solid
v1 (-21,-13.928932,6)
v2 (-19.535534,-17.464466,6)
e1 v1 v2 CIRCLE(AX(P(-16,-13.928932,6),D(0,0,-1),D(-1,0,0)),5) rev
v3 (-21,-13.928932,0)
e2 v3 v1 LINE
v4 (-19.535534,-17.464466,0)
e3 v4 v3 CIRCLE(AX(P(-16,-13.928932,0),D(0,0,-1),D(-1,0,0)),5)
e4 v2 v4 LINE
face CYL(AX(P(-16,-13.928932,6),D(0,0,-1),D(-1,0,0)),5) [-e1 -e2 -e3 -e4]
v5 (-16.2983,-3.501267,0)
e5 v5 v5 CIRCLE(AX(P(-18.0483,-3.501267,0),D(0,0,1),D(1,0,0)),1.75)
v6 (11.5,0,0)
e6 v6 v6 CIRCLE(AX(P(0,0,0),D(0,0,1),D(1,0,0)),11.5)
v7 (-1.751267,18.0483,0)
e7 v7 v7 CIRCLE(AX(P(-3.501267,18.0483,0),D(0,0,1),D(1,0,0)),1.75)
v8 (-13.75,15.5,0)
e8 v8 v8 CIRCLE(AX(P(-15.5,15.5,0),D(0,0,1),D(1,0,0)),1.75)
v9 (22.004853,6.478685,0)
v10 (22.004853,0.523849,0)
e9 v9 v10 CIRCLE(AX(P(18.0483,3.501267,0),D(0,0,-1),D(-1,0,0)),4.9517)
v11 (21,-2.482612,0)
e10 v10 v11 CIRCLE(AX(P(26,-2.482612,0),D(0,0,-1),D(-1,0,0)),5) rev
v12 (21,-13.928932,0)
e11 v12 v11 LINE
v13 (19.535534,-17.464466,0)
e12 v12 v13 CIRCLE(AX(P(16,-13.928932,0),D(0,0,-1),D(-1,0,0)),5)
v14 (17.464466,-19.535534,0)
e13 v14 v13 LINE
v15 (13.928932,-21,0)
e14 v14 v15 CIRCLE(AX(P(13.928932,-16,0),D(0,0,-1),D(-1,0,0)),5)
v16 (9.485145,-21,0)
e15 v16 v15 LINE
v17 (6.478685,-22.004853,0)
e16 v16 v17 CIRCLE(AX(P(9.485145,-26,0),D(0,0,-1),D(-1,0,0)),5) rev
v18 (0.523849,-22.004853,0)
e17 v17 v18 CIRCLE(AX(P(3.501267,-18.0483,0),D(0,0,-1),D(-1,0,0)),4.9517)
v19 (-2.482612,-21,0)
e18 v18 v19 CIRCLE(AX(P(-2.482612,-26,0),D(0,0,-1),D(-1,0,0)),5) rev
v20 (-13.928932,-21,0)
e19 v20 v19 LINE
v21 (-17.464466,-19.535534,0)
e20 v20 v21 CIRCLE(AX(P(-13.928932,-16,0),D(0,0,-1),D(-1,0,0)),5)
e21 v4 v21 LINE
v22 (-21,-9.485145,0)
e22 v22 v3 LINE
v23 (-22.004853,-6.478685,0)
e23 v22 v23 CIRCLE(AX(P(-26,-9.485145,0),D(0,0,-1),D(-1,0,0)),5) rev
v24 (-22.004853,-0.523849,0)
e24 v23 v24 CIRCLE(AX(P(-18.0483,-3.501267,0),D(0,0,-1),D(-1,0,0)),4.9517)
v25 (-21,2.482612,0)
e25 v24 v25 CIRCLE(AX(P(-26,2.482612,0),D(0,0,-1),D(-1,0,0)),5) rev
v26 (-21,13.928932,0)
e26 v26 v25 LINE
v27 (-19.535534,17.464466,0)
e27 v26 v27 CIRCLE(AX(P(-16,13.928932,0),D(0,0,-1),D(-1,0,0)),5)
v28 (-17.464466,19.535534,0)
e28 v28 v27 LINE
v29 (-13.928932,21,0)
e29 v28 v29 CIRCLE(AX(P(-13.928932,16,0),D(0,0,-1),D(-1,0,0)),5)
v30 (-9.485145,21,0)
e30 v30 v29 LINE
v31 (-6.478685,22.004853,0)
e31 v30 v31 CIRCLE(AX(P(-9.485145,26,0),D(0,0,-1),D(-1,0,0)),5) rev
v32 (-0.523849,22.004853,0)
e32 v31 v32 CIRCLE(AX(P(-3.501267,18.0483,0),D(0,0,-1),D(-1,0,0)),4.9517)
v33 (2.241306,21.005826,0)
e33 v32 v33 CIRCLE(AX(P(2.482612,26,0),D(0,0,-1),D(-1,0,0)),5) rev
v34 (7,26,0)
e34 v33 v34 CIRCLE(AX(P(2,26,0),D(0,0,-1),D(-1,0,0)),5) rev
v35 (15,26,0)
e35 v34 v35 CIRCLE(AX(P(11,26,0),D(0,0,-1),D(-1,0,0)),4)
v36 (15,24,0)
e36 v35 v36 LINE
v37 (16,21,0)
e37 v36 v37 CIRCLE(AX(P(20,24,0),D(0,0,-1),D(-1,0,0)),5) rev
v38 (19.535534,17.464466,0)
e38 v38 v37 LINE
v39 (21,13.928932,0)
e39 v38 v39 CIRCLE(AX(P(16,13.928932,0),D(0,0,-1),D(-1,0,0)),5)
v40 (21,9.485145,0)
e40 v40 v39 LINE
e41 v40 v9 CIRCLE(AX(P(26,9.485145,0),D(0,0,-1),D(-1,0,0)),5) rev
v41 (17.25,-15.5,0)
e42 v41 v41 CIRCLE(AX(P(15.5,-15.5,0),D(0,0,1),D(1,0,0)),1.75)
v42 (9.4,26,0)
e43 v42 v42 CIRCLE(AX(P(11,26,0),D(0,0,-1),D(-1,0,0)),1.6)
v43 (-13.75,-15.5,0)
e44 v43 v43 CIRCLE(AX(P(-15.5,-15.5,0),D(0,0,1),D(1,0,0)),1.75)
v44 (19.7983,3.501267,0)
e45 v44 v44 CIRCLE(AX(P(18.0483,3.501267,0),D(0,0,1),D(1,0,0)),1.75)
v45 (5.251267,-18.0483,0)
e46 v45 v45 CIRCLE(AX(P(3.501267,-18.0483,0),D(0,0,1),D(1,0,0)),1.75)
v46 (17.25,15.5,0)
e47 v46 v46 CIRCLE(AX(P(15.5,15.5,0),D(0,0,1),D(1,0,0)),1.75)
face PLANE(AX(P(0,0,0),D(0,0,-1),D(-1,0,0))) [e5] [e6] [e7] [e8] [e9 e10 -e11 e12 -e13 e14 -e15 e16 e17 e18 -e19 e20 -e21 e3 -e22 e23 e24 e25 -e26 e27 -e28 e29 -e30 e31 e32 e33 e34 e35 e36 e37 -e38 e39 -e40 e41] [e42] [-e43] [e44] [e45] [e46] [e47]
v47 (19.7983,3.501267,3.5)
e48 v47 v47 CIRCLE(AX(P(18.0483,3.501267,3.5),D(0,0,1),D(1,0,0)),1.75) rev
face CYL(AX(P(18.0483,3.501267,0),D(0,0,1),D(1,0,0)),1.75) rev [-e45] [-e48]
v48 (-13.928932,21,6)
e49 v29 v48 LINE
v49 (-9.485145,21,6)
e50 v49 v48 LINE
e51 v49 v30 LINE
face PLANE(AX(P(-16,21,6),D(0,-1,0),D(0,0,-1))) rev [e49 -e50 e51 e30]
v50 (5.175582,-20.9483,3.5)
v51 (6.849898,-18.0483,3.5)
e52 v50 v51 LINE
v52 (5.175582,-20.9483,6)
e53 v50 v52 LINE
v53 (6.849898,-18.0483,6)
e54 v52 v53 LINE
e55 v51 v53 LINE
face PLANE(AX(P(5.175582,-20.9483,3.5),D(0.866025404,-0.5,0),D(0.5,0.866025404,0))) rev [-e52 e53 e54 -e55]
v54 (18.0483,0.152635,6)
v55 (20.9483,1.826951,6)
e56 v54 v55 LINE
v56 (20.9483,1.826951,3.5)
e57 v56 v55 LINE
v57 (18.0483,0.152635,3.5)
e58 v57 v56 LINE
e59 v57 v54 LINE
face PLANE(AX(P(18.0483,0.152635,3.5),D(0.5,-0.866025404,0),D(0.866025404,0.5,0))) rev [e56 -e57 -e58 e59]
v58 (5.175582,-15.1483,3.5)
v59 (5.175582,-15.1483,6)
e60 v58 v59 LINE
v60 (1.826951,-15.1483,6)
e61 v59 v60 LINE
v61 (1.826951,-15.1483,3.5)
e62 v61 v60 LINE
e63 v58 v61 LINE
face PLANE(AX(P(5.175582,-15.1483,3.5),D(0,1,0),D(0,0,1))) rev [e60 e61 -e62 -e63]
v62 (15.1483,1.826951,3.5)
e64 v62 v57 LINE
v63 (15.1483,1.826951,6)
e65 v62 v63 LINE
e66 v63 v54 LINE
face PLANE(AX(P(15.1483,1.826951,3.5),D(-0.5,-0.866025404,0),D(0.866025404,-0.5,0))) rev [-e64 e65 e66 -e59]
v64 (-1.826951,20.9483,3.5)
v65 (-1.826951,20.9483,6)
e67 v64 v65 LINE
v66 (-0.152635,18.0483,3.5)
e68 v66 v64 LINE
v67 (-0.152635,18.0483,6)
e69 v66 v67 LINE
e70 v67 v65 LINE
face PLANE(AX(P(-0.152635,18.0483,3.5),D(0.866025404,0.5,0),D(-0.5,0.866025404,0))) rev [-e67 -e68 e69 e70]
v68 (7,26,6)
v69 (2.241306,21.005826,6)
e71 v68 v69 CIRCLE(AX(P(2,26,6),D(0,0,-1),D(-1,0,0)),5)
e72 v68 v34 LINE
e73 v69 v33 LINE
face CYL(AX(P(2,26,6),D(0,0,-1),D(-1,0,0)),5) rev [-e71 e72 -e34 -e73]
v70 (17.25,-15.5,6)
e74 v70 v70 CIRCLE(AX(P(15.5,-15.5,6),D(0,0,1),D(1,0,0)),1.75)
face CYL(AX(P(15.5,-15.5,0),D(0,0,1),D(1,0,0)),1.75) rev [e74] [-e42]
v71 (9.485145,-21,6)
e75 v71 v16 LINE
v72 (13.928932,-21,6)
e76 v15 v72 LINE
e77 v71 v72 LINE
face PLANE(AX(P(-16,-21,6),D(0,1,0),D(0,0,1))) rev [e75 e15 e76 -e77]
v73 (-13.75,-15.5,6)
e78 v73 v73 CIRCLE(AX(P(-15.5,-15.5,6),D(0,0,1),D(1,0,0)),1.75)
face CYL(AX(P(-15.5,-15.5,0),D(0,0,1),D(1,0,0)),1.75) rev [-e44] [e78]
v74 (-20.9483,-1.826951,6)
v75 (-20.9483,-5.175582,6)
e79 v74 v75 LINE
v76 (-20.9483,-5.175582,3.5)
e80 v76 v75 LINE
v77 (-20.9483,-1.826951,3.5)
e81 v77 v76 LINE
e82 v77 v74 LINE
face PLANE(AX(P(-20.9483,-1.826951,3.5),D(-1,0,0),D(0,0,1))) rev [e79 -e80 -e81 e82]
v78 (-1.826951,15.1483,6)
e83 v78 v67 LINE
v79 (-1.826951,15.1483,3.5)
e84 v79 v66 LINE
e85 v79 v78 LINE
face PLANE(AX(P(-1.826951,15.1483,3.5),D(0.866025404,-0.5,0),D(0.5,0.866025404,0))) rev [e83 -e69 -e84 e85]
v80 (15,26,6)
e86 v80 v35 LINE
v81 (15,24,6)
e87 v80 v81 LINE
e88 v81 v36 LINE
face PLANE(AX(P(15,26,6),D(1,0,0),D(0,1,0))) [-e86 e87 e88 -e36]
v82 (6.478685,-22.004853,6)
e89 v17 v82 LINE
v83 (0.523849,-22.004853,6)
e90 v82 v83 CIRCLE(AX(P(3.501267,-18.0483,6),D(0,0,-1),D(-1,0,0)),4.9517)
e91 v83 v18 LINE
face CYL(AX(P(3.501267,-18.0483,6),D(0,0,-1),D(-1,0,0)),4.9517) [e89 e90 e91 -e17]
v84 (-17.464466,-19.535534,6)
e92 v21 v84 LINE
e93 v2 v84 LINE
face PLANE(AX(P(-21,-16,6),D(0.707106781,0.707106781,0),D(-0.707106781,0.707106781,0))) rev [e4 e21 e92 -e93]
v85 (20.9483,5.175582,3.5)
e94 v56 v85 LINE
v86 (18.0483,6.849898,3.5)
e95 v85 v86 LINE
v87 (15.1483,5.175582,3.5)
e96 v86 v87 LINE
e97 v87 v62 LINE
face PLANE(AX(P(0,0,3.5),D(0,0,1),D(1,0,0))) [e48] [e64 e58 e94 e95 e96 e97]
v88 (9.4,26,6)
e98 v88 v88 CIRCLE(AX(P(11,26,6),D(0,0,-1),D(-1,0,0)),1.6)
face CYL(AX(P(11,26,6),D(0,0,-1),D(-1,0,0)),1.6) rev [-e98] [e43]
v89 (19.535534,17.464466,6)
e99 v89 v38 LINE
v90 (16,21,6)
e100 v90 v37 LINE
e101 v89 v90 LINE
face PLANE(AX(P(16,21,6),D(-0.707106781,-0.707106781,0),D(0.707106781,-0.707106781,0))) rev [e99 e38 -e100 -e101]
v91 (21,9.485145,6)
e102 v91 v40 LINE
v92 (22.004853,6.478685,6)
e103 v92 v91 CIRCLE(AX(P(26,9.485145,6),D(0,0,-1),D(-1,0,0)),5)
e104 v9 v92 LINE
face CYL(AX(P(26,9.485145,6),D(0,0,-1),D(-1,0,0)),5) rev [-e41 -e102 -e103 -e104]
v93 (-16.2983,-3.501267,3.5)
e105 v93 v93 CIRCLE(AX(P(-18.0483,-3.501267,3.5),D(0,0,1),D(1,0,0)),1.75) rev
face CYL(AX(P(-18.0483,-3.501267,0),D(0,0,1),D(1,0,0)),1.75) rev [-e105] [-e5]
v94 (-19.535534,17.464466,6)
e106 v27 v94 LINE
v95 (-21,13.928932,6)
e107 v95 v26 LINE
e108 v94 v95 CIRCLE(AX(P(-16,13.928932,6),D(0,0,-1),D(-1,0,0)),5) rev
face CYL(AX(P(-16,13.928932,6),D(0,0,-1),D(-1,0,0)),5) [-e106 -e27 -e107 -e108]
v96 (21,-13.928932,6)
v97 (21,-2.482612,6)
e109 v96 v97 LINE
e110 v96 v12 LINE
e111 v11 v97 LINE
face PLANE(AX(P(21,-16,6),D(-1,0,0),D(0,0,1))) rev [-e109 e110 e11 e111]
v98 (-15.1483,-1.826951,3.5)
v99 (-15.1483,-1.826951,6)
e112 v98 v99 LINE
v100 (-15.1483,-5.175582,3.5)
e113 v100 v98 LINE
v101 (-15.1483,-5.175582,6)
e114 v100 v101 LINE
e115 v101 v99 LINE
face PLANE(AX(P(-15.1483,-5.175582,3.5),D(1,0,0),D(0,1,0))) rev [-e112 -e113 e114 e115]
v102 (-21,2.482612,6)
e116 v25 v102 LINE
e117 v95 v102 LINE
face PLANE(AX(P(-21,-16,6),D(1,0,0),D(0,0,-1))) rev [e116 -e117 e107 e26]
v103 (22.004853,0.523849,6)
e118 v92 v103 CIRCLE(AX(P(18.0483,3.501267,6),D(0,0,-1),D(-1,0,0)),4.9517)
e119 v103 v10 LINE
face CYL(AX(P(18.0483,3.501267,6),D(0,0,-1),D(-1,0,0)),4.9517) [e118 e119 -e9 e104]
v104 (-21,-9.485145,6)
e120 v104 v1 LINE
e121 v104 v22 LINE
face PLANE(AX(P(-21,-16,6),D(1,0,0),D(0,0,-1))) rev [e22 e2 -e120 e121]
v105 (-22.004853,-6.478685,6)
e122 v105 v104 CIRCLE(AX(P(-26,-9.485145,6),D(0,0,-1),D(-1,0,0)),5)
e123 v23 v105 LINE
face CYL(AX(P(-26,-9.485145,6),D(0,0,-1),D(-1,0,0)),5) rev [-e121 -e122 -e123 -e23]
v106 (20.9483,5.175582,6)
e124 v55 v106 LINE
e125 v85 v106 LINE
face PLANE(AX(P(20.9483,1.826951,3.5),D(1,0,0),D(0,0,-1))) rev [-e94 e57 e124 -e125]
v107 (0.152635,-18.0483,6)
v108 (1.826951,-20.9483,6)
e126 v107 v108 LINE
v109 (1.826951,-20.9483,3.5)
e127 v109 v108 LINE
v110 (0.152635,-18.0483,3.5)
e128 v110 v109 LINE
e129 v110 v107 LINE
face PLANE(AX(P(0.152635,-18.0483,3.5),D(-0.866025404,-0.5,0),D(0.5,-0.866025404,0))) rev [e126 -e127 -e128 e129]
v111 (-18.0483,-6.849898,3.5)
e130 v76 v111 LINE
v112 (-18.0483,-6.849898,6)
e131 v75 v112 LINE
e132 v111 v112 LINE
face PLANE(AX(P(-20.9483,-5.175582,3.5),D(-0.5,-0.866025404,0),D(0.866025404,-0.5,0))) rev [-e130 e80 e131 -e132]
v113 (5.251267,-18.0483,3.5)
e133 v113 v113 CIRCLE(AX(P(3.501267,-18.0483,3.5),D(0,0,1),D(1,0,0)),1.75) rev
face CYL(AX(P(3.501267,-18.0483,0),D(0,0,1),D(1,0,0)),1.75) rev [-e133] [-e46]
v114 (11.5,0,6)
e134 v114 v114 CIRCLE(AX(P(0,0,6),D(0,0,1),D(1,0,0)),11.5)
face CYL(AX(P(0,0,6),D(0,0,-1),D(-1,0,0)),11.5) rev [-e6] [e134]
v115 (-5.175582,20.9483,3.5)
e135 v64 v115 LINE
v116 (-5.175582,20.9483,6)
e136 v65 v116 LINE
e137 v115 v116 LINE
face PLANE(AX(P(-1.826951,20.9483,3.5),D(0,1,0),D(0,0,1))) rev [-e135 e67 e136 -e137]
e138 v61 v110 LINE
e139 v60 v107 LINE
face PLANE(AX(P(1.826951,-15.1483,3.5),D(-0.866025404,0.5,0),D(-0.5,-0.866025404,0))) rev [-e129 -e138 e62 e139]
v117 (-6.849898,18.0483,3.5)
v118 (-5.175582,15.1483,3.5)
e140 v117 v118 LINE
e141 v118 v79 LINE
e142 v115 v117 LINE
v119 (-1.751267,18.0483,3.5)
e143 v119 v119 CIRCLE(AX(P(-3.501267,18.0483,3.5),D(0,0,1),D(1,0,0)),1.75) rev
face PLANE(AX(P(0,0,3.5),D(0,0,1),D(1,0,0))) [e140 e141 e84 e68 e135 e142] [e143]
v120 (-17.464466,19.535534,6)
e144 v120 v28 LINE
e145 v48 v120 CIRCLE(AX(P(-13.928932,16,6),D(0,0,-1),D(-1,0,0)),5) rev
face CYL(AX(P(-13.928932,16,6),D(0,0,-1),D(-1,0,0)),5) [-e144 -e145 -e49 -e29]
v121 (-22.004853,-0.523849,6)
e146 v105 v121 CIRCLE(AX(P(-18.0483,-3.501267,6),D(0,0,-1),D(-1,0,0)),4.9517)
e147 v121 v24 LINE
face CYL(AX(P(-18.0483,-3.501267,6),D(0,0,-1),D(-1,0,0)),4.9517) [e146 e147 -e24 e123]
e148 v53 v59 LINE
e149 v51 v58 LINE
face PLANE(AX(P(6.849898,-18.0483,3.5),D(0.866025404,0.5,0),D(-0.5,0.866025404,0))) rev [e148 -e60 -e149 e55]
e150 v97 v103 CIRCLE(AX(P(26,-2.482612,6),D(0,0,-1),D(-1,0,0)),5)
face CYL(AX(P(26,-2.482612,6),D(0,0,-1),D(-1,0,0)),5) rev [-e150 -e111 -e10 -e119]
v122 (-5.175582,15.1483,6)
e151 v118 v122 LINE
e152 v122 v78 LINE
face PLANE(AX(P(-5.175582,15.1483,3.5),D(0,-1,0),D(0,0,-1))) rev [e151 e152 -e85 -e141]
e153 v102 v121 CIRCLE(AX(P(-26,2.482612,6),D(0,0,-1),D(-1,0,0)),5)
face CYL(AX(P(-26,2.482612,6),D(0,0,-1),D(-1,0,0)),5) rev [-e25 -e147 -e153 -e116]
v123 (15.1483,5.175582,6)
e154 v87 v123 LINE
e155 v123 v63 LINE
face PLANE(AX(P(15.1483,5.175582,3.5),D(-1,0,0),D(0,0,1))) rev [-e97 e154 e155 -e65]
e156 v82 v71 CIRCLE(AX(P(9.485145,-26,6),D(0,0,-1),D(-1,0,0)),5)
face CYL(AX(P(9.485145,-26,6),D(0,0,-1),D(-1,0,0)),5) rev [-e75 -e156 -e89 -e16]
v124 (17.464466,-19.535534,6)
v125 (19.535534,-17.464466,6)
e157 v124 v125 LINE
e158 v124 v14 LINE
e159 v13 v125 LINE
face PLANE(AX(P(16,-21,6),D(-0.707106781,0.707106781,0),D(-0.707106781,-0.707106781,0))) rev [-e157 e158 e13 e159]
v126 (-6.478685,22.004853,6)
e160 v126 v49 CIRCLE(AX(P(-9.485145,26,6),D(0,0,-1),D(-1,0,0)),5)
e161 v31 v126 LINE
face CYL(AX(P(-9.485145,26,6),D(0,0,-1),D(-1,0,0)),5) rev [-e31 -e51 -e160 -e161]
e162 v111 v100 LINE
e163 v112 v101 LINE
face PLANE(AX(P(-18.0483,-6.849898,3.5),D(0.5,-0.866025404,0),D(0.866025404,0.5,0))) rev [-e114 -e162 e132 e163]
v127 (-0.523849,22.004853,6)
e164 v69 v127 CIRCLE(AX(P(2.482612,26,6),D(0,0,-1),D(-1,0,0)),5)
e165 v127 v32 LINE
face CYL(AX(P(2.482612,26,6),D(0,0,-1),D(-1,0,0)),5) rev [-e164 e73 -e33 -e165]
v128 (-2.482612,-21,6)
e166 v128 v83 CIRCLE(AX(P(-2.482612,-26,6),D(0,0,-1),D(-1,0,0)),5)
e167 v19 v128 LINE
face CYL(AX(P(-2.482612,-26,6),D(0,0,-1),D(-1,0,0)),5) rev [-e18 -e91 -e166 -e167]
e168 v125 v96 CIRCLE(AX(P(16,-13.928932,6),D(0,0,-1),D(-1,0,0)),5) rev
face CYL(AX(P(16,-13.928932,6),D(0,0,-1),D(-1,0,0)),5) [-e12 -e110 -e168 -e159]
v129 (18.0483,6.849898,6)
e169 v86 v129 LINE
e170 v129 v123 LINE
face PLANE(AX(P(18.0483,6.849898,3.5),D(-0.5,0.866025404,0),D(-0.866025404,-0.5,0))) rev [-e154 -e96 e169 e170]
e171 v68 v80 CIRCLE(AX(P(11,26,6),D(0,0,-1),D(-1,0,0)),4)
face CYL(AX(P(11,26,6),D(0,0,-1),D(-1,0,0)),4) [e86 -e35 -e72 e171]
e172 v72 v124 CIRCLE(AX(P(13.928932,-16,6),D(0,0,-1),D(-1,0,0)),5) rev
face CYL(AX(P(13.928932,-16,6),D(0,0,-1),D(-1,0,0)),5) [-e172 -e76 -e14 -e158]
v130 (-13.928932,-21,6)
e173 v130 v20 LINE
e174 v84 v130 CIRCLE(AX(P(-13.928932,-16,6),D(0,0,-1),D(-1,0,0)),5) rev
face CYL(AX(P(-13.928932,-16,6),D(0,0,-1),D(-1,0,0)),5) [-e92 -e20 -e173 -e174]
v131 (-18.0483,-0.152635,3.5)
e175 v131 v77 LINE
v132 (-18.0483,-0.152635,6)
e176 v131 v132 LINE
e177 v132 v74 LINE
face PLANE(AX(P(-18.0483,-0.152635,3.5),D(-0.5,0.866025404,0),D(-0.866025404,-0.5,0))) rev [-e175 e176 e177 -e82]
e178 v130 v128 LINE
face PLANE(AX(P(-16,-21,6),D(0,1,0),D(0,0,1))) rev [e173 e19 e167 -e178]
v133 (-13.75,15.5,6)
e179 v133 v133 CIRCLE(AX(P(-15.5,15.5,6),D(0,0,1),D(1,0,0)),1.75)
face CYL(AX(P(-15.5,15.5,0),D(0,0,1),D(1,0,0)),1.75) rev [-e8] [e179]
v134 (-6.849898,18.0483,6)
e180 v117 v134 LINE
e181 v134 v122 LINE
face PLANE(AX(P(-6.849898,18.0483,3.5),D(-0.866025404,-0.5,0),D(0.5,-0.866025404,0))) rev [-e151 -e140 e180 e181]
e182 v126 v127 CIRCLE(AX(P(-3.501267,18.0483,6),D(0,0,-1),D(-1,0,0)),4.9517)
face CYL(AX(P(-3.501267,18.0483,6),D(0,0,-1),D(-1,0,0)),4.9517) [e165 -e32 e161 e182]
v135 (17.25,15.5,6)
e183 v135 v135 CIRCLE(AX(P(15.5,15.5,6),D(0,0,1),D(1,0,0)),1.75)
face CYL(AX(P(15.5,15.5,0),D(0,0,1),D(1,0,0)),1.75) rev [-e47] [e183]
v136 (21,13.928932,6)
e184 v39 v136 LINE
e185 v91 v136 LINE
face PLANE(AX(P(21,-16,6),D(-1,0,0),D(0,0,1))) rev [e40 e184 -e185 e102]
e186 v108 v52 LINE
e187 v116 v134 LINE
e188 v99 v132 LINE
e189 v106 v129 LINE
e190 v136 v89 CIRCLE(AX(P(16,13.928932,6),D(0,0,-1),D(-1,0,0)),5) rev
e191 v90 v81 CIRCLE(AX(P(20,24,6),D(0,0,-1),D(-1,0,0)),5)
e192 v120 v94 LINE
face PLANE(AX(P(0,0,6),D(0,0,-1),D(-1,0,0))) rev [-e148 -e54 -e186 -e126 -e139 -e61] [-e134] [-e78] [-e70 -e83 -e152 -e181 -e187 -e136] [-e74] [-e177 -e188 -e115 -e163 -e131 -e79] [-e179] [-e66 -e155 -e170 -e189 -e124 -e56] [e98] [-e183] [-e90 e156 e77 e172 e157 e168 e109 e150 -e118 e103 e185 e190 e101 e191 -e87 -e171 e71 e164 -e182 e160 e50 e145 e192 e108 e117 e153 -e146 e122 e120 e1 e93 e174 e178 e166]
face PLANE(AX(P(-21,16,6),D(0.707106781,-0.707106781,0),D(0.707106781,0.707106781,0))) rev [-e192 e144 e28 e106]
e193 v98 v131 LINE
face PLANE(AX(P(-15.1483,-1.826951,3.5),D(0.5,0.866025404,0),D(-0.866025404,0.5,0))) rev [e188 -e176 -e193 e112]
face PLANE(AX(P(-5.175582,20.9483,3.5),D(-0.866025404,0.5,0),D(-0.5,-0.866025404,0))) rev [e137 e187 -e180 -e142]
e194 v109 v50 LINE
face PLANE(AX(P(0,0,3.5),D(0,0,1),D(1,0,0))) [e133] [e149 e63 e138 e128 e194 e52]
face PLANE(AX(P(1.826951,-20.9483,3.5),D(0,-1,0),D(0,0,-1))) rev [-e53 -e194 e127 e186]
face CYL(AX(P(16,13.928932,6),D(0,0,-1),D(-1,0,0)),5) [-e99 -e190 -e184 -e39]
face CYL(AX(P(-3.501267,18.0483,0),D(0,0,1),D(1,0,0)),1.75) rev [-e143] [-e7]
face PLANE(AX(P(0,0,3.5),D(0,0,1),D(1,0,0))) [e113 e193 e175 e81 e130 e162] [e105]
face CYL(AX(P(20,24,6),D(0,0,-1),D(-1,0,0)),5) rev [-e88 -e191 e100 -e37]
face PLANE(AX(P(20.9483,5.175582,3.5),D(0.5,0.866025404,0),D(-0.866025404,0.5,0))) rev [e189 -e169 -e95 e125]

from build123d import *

# Parameters (mm, degrees)
SKETCH1_R           = 11.5
BOSS_EXTRUDE1_DEPTH = 6
SKETCH5_R           = 4.951700006
BOSS_EXTRUDE3_DEPTH = 6
SKETCH2_R           = 1.75
CUT_EXTRUDE1_DEPTH  = 34.075670817
SKETCH3_R           = 1.75
CUT_EXTRUDE2_DEPTH  = 34.075670817
CUT_EXTRUDE3_DEPTH  = 2.5
SKETCH6_R           = 1.6
BOSS_EXTRUDE4_DEPTH = 6
FILLET1_R           = 5


with BuildPart() as part:
    # Sketch1 → Boss-Extrude1 (new body)
    with BuildSketch(Plane.XY):
        Polygon((-21, 16), (-16, 21), (16, 21), (21, 16), (21, -16), (16, -21), (-16, -21), (-21, -16), align=None)
        Circle(SKETCH1_R, mode=Mode.SUBTRACT)
    extrude(amount=BOSS_EXTRUDE1_DEPTH)

    # Sketch5 → Boss-Extrude3 (add)
    with BuildSketch(Plane(origin=(0, 0, 0), x_dir=(-1, 0, 0), z_dir=(0, 0, -1))):
        with Locations((-18.048299994, 3.501266534)):
            Circle(SKETCH5_R)
        with Locations((3.501266534, 18.048299994)):
            Circle(SKETCH5_R)
        with Locations((18.048299994, -3.501266534)):
            Circle(SKETCH5_R)
        with Locations((-3.501266534, -18.048299994)):
            Circle(SKETCH5_R)
    extrude(amount=-BOSS_EXTRUDE3_DEPTH)

    # Sketch2 → Cut-Extrude1 (cut, through all)
    with BuildSketch(Plane.XY.offset(6)):
        with Locations((-15.5, 15.5)):
            Circle(SKETCH2_R)
        with Locations((15.5, 15.5)):
            Circle(SKETCH2_R)
        with Locations((15.5, -15.5)):
            Circle(SKETCH2_R)
        with Locations((-15.5, -15.5)):
            Circle(SKETCH2_R)
    extrude(amount=-CUT_EXTRUDE1_DEPTH, mode=Mode.SUBTRACT)

    # Sketch3 → Cut-Extrude2 (cut, through all)
    with BuildSketch(Plane.XY.offset(6)):
        with Locations((-3.501266534, 18.048299994)):
            Circle(SKETCH3_R)
        with Locations((18.048299994, 3.501266534)):
            Circle(SKETCH3_R)
        with Locations((3.501266534, -18.048299994)):
            Circle(SKETCH3_R)
        with Locations((-18.048299994, -3.501266534)):
            Circle(SKETCH3_R)
    extrude(amount=-CUT_EXTRUDE2_DEPTH, mode=Mode.SUBTRACT)

    # Sketch4 → Cut-Extrude3 (cut)
    with BuildSketch(Plane.XY.offset(6)):
        Polygon((-0.152634973, 18.048299994), (-1.826950753, 20.948299994), (-5.175582315, 20.948299994), (-6.849898095, 18.048299994), (-5.175582315, 15.148299994), (-1.826950753, 15.148299994), align=None)
        Polygon((18.048299994, 6.849898095), (15.148299994, 5.175582315), (15.148299994, 1.826950753), (18.048299994, 0.152634973), (20.948299994, 1.826950753), (20.948299994, 5.175582315), align=None)
        Polygon((-18.048299994, -6.849898095), (-15.148299994, -5.175582315), (-15.148299994, -1.826950753), (-18.048299994, -0.152634973), (-20.948299994, -1.826950753), (-20.948299994, -5.175582315), align=None)
        Polygon((6.849898095, -18.048299994), (5.175582315, -15.148299994), (1.826950753, -15.148299994), (0.152634973, -18.048299994), (1.826950753, -20.948299994), (5.175582315, -20.948299994), align=None)
    extrude(amount=-CUT_EXTRUDE3_DEPTH, mode=Mode.SUBTRACT)

    # Sketch6 → Boss-Extrude4 (add)
    with BuildSketch(Plane(origin=(0, 0, 0), x_dir=(-1, 0, 0), z_dir=(0, 0, -1))):
        with BuildLine():
            Line((-15, 26), (-15, 21))
            Line((-15, 21), (-7, 21))
            Line((-7, 21), (-7, 26))
            ThreePointArc((-7, 26), (-11, 30), (-15, 26))
        make_face()
        with Locations((-11, 26)):
            Circle(SKETCH6_R, mode=Mode.SUBTRACT)
    extrude(amount=-BOSS_EXTRUDE4_DEPTH)

    # Fillet1
    # the kernel refuses this fillet: 5 mm, written as the material it adds along each edge
    with BuildSketch(Plane(origin=(15, 21, 0), x_dir=(1, 0, 0), z_dir=(0, 0, 1))) as fillet1_piece_1:
        with BuildLine():
            CenterArc((5, 3), FILLET1_R, 180, 36.869897646)
            Line((0, 3), (0, 0))
            Line((0, 0), (1, 0))
        make_face()
    extrude(amount=6)
    with BuildSketch(Plane(origin=(7, 21, 0), x_dir=(-1, 0, 0), z_dir=(0, 0, 1))) as fillet1_piece_2:
        with BuildLine():
            CenterArc((FILLET1_R, -FILLET1_R), FILLET1_R, 90, 90)
            Line((0, -FILLET1_R), (0, 0))
            Line((0, 0), (FILLET1_R, 0))
        make_face()
    extrude(amount=6)
    with BuildSketch(Plane(origin=(7.477043191, -21, 6), x_dir=(-0.7048105163679362, -0.7093956131927819, 0), z_dir=(0, 0, -1)), Plane(origin=(-21, -7.477043191, 6), x_dir=(-0.7093956131927642, 0.7048105163679541, 0), z_dir=(0, 0, -1))) as fillet1_piece_3:
        with BuildLine():
            CenterArc((2.13164688, -4.948591109), FILLET1_R, 98.223270181, 36.962491831)
            Line((-1.415331186, -1.424538527), (0, 0))
            ThreePointArc((0, 0), (0.708246162, -0.050912281), (1.416492325, 0))
        make_face()
    extrude(amount=6)
    with BuildSketch(Plane(origin=(-0.474510123, -21, 6), x_dir=(-1, 0, 0), z_dir=(0, 0, -1)), Plane(origin=(-21, 0.474510123, 6), x_dir=(0, 1, 0), z_dir=(0, 0, -1))) as fillet1_piece_4:
        with BuildLine():
            CenterArc((2.008101686, -5), FILLET1_R, 90, 36.962491831)
            ThreePointArc((-0.998358687, -1.004853441), (-0.463062395, -0.538310232), (0, 0))
            Line((0, 0), (2.008101686, 0))
        make_face()
    extrude(amount=6)
    with BuildSketch(Plane(origin=(-7.477043191, 21, 6), x_dir=(-1, 0, 0), z_dir=(0, 0, -1)), Plane(origin=(21, 7.477043191, 6), x_dir=(0, 1, 0), z_dir=(0, 0, -1))) as fillet1_piece_5:
        with BuildLine():
            CenterArc((2.008101686, 5), FILLET1_R, 233.037508169, 36.962491831)
            ThreePointArc((-0.998358687, 1.004853441), (-0.463062395, 0.538310232), (0, 0))
            Line((0, 0), (2.008101686, 0))
        make_face()
    extrude(amount=6)
    with BuildSketch(Plane(origin=(0.474510123, 21, 6), x_dir=(-0.7048105163680716, 0.7093956131926475, 0), z_dir=(0, 0, -1)), Plane(origin=(21, -0.474510123, 6), x_dir=(0.7093956131926695, 0.7048105163680495, 0), z_dir=(0, 0, -1))) as fillet1_piece_6:
        with BuildLine():
            CenterArc((2.13164688, 4.948591109), FILLET1_R, 224.814237988, 36.962491831)
            Line((-1.415331186, 1.424538527), (0, 0))
            ThreePointArc((0, 0), (0.708246162, 0.050912281), (1.416492325, 0))
        make_face()
    extrude(amount=6)
    # the kernel refuses this fillet: 5 mm, written as the material it takes off along each edge
    with BuildSketch(Plane(origin=(21, -16, -5.17766953), x_dir=(0, 1, 0), z_dir=(0, 0, 1)), Plane(origin=(16, -21, -5.17766953), x_dir=(0.7071067811865476, 0.7071067811865476, 0), z_dir=(0, 0, 1)), Plane(origin=(-16, -21, -5.17766953), x_dir=(1, 0, 0), z_dir=(0, 0, 1)), Plane(origin=(-21, -16, -5.17766953), x_dir=(0.7071067811865476, -0.7071067811865476, 0), z_dir=(0, 0, 1)), Plane(origin=(-16, 21, -5.17766953), x_dir=(-0.7071067811865476, -0.7071067811865476, 0), z_dir=(0, 0, 1)), Plane(origin=(21, 16, -5.17766953), x_dir=(-0.7071067811865476, 0.7071067811865476, 0), z_dir=(0, 0, 1))) as fillet1_2_piece_1:
        with BuildLine():
            CenterArc((FILLET1_R * 0.414213562373, FILLET1_R), FILLET1_R, 225, 45)
            Line((-FILLET1_R * 0.292893218813, FILLET1_R * 0.292893218813), (0, 0))
            Line((0, 0), (FILLET1_R * 0.414213562373, 0))
        make_face()
    extrude(amount=16.355339059, mode=Mode.SUBTRACT)
    with BuildSketch(Plane(origin=(-21, 16, -5.17766953), x_dir=(0.7071067811865476, 0.7071067811865476, 0), z_dir=(0, 0, 1))) as fillet1_2_piece_2:
        with BuildLine():
            CenterArc((FILLET1_R * 0.414213562373, -FILLET1_R), FILLET1_R, 90, 45)
            Line((-FILLET1_R * 0.292893218813, -FILLET1_R * 0.292893218813), (0, 0))
            Line((0, 0), (FILLET1_R * 0.414213562373, 0))
        make_face()
    extrude(amount=16.355339059, mode=Mode.SUBTRACT)


solid = part.part
